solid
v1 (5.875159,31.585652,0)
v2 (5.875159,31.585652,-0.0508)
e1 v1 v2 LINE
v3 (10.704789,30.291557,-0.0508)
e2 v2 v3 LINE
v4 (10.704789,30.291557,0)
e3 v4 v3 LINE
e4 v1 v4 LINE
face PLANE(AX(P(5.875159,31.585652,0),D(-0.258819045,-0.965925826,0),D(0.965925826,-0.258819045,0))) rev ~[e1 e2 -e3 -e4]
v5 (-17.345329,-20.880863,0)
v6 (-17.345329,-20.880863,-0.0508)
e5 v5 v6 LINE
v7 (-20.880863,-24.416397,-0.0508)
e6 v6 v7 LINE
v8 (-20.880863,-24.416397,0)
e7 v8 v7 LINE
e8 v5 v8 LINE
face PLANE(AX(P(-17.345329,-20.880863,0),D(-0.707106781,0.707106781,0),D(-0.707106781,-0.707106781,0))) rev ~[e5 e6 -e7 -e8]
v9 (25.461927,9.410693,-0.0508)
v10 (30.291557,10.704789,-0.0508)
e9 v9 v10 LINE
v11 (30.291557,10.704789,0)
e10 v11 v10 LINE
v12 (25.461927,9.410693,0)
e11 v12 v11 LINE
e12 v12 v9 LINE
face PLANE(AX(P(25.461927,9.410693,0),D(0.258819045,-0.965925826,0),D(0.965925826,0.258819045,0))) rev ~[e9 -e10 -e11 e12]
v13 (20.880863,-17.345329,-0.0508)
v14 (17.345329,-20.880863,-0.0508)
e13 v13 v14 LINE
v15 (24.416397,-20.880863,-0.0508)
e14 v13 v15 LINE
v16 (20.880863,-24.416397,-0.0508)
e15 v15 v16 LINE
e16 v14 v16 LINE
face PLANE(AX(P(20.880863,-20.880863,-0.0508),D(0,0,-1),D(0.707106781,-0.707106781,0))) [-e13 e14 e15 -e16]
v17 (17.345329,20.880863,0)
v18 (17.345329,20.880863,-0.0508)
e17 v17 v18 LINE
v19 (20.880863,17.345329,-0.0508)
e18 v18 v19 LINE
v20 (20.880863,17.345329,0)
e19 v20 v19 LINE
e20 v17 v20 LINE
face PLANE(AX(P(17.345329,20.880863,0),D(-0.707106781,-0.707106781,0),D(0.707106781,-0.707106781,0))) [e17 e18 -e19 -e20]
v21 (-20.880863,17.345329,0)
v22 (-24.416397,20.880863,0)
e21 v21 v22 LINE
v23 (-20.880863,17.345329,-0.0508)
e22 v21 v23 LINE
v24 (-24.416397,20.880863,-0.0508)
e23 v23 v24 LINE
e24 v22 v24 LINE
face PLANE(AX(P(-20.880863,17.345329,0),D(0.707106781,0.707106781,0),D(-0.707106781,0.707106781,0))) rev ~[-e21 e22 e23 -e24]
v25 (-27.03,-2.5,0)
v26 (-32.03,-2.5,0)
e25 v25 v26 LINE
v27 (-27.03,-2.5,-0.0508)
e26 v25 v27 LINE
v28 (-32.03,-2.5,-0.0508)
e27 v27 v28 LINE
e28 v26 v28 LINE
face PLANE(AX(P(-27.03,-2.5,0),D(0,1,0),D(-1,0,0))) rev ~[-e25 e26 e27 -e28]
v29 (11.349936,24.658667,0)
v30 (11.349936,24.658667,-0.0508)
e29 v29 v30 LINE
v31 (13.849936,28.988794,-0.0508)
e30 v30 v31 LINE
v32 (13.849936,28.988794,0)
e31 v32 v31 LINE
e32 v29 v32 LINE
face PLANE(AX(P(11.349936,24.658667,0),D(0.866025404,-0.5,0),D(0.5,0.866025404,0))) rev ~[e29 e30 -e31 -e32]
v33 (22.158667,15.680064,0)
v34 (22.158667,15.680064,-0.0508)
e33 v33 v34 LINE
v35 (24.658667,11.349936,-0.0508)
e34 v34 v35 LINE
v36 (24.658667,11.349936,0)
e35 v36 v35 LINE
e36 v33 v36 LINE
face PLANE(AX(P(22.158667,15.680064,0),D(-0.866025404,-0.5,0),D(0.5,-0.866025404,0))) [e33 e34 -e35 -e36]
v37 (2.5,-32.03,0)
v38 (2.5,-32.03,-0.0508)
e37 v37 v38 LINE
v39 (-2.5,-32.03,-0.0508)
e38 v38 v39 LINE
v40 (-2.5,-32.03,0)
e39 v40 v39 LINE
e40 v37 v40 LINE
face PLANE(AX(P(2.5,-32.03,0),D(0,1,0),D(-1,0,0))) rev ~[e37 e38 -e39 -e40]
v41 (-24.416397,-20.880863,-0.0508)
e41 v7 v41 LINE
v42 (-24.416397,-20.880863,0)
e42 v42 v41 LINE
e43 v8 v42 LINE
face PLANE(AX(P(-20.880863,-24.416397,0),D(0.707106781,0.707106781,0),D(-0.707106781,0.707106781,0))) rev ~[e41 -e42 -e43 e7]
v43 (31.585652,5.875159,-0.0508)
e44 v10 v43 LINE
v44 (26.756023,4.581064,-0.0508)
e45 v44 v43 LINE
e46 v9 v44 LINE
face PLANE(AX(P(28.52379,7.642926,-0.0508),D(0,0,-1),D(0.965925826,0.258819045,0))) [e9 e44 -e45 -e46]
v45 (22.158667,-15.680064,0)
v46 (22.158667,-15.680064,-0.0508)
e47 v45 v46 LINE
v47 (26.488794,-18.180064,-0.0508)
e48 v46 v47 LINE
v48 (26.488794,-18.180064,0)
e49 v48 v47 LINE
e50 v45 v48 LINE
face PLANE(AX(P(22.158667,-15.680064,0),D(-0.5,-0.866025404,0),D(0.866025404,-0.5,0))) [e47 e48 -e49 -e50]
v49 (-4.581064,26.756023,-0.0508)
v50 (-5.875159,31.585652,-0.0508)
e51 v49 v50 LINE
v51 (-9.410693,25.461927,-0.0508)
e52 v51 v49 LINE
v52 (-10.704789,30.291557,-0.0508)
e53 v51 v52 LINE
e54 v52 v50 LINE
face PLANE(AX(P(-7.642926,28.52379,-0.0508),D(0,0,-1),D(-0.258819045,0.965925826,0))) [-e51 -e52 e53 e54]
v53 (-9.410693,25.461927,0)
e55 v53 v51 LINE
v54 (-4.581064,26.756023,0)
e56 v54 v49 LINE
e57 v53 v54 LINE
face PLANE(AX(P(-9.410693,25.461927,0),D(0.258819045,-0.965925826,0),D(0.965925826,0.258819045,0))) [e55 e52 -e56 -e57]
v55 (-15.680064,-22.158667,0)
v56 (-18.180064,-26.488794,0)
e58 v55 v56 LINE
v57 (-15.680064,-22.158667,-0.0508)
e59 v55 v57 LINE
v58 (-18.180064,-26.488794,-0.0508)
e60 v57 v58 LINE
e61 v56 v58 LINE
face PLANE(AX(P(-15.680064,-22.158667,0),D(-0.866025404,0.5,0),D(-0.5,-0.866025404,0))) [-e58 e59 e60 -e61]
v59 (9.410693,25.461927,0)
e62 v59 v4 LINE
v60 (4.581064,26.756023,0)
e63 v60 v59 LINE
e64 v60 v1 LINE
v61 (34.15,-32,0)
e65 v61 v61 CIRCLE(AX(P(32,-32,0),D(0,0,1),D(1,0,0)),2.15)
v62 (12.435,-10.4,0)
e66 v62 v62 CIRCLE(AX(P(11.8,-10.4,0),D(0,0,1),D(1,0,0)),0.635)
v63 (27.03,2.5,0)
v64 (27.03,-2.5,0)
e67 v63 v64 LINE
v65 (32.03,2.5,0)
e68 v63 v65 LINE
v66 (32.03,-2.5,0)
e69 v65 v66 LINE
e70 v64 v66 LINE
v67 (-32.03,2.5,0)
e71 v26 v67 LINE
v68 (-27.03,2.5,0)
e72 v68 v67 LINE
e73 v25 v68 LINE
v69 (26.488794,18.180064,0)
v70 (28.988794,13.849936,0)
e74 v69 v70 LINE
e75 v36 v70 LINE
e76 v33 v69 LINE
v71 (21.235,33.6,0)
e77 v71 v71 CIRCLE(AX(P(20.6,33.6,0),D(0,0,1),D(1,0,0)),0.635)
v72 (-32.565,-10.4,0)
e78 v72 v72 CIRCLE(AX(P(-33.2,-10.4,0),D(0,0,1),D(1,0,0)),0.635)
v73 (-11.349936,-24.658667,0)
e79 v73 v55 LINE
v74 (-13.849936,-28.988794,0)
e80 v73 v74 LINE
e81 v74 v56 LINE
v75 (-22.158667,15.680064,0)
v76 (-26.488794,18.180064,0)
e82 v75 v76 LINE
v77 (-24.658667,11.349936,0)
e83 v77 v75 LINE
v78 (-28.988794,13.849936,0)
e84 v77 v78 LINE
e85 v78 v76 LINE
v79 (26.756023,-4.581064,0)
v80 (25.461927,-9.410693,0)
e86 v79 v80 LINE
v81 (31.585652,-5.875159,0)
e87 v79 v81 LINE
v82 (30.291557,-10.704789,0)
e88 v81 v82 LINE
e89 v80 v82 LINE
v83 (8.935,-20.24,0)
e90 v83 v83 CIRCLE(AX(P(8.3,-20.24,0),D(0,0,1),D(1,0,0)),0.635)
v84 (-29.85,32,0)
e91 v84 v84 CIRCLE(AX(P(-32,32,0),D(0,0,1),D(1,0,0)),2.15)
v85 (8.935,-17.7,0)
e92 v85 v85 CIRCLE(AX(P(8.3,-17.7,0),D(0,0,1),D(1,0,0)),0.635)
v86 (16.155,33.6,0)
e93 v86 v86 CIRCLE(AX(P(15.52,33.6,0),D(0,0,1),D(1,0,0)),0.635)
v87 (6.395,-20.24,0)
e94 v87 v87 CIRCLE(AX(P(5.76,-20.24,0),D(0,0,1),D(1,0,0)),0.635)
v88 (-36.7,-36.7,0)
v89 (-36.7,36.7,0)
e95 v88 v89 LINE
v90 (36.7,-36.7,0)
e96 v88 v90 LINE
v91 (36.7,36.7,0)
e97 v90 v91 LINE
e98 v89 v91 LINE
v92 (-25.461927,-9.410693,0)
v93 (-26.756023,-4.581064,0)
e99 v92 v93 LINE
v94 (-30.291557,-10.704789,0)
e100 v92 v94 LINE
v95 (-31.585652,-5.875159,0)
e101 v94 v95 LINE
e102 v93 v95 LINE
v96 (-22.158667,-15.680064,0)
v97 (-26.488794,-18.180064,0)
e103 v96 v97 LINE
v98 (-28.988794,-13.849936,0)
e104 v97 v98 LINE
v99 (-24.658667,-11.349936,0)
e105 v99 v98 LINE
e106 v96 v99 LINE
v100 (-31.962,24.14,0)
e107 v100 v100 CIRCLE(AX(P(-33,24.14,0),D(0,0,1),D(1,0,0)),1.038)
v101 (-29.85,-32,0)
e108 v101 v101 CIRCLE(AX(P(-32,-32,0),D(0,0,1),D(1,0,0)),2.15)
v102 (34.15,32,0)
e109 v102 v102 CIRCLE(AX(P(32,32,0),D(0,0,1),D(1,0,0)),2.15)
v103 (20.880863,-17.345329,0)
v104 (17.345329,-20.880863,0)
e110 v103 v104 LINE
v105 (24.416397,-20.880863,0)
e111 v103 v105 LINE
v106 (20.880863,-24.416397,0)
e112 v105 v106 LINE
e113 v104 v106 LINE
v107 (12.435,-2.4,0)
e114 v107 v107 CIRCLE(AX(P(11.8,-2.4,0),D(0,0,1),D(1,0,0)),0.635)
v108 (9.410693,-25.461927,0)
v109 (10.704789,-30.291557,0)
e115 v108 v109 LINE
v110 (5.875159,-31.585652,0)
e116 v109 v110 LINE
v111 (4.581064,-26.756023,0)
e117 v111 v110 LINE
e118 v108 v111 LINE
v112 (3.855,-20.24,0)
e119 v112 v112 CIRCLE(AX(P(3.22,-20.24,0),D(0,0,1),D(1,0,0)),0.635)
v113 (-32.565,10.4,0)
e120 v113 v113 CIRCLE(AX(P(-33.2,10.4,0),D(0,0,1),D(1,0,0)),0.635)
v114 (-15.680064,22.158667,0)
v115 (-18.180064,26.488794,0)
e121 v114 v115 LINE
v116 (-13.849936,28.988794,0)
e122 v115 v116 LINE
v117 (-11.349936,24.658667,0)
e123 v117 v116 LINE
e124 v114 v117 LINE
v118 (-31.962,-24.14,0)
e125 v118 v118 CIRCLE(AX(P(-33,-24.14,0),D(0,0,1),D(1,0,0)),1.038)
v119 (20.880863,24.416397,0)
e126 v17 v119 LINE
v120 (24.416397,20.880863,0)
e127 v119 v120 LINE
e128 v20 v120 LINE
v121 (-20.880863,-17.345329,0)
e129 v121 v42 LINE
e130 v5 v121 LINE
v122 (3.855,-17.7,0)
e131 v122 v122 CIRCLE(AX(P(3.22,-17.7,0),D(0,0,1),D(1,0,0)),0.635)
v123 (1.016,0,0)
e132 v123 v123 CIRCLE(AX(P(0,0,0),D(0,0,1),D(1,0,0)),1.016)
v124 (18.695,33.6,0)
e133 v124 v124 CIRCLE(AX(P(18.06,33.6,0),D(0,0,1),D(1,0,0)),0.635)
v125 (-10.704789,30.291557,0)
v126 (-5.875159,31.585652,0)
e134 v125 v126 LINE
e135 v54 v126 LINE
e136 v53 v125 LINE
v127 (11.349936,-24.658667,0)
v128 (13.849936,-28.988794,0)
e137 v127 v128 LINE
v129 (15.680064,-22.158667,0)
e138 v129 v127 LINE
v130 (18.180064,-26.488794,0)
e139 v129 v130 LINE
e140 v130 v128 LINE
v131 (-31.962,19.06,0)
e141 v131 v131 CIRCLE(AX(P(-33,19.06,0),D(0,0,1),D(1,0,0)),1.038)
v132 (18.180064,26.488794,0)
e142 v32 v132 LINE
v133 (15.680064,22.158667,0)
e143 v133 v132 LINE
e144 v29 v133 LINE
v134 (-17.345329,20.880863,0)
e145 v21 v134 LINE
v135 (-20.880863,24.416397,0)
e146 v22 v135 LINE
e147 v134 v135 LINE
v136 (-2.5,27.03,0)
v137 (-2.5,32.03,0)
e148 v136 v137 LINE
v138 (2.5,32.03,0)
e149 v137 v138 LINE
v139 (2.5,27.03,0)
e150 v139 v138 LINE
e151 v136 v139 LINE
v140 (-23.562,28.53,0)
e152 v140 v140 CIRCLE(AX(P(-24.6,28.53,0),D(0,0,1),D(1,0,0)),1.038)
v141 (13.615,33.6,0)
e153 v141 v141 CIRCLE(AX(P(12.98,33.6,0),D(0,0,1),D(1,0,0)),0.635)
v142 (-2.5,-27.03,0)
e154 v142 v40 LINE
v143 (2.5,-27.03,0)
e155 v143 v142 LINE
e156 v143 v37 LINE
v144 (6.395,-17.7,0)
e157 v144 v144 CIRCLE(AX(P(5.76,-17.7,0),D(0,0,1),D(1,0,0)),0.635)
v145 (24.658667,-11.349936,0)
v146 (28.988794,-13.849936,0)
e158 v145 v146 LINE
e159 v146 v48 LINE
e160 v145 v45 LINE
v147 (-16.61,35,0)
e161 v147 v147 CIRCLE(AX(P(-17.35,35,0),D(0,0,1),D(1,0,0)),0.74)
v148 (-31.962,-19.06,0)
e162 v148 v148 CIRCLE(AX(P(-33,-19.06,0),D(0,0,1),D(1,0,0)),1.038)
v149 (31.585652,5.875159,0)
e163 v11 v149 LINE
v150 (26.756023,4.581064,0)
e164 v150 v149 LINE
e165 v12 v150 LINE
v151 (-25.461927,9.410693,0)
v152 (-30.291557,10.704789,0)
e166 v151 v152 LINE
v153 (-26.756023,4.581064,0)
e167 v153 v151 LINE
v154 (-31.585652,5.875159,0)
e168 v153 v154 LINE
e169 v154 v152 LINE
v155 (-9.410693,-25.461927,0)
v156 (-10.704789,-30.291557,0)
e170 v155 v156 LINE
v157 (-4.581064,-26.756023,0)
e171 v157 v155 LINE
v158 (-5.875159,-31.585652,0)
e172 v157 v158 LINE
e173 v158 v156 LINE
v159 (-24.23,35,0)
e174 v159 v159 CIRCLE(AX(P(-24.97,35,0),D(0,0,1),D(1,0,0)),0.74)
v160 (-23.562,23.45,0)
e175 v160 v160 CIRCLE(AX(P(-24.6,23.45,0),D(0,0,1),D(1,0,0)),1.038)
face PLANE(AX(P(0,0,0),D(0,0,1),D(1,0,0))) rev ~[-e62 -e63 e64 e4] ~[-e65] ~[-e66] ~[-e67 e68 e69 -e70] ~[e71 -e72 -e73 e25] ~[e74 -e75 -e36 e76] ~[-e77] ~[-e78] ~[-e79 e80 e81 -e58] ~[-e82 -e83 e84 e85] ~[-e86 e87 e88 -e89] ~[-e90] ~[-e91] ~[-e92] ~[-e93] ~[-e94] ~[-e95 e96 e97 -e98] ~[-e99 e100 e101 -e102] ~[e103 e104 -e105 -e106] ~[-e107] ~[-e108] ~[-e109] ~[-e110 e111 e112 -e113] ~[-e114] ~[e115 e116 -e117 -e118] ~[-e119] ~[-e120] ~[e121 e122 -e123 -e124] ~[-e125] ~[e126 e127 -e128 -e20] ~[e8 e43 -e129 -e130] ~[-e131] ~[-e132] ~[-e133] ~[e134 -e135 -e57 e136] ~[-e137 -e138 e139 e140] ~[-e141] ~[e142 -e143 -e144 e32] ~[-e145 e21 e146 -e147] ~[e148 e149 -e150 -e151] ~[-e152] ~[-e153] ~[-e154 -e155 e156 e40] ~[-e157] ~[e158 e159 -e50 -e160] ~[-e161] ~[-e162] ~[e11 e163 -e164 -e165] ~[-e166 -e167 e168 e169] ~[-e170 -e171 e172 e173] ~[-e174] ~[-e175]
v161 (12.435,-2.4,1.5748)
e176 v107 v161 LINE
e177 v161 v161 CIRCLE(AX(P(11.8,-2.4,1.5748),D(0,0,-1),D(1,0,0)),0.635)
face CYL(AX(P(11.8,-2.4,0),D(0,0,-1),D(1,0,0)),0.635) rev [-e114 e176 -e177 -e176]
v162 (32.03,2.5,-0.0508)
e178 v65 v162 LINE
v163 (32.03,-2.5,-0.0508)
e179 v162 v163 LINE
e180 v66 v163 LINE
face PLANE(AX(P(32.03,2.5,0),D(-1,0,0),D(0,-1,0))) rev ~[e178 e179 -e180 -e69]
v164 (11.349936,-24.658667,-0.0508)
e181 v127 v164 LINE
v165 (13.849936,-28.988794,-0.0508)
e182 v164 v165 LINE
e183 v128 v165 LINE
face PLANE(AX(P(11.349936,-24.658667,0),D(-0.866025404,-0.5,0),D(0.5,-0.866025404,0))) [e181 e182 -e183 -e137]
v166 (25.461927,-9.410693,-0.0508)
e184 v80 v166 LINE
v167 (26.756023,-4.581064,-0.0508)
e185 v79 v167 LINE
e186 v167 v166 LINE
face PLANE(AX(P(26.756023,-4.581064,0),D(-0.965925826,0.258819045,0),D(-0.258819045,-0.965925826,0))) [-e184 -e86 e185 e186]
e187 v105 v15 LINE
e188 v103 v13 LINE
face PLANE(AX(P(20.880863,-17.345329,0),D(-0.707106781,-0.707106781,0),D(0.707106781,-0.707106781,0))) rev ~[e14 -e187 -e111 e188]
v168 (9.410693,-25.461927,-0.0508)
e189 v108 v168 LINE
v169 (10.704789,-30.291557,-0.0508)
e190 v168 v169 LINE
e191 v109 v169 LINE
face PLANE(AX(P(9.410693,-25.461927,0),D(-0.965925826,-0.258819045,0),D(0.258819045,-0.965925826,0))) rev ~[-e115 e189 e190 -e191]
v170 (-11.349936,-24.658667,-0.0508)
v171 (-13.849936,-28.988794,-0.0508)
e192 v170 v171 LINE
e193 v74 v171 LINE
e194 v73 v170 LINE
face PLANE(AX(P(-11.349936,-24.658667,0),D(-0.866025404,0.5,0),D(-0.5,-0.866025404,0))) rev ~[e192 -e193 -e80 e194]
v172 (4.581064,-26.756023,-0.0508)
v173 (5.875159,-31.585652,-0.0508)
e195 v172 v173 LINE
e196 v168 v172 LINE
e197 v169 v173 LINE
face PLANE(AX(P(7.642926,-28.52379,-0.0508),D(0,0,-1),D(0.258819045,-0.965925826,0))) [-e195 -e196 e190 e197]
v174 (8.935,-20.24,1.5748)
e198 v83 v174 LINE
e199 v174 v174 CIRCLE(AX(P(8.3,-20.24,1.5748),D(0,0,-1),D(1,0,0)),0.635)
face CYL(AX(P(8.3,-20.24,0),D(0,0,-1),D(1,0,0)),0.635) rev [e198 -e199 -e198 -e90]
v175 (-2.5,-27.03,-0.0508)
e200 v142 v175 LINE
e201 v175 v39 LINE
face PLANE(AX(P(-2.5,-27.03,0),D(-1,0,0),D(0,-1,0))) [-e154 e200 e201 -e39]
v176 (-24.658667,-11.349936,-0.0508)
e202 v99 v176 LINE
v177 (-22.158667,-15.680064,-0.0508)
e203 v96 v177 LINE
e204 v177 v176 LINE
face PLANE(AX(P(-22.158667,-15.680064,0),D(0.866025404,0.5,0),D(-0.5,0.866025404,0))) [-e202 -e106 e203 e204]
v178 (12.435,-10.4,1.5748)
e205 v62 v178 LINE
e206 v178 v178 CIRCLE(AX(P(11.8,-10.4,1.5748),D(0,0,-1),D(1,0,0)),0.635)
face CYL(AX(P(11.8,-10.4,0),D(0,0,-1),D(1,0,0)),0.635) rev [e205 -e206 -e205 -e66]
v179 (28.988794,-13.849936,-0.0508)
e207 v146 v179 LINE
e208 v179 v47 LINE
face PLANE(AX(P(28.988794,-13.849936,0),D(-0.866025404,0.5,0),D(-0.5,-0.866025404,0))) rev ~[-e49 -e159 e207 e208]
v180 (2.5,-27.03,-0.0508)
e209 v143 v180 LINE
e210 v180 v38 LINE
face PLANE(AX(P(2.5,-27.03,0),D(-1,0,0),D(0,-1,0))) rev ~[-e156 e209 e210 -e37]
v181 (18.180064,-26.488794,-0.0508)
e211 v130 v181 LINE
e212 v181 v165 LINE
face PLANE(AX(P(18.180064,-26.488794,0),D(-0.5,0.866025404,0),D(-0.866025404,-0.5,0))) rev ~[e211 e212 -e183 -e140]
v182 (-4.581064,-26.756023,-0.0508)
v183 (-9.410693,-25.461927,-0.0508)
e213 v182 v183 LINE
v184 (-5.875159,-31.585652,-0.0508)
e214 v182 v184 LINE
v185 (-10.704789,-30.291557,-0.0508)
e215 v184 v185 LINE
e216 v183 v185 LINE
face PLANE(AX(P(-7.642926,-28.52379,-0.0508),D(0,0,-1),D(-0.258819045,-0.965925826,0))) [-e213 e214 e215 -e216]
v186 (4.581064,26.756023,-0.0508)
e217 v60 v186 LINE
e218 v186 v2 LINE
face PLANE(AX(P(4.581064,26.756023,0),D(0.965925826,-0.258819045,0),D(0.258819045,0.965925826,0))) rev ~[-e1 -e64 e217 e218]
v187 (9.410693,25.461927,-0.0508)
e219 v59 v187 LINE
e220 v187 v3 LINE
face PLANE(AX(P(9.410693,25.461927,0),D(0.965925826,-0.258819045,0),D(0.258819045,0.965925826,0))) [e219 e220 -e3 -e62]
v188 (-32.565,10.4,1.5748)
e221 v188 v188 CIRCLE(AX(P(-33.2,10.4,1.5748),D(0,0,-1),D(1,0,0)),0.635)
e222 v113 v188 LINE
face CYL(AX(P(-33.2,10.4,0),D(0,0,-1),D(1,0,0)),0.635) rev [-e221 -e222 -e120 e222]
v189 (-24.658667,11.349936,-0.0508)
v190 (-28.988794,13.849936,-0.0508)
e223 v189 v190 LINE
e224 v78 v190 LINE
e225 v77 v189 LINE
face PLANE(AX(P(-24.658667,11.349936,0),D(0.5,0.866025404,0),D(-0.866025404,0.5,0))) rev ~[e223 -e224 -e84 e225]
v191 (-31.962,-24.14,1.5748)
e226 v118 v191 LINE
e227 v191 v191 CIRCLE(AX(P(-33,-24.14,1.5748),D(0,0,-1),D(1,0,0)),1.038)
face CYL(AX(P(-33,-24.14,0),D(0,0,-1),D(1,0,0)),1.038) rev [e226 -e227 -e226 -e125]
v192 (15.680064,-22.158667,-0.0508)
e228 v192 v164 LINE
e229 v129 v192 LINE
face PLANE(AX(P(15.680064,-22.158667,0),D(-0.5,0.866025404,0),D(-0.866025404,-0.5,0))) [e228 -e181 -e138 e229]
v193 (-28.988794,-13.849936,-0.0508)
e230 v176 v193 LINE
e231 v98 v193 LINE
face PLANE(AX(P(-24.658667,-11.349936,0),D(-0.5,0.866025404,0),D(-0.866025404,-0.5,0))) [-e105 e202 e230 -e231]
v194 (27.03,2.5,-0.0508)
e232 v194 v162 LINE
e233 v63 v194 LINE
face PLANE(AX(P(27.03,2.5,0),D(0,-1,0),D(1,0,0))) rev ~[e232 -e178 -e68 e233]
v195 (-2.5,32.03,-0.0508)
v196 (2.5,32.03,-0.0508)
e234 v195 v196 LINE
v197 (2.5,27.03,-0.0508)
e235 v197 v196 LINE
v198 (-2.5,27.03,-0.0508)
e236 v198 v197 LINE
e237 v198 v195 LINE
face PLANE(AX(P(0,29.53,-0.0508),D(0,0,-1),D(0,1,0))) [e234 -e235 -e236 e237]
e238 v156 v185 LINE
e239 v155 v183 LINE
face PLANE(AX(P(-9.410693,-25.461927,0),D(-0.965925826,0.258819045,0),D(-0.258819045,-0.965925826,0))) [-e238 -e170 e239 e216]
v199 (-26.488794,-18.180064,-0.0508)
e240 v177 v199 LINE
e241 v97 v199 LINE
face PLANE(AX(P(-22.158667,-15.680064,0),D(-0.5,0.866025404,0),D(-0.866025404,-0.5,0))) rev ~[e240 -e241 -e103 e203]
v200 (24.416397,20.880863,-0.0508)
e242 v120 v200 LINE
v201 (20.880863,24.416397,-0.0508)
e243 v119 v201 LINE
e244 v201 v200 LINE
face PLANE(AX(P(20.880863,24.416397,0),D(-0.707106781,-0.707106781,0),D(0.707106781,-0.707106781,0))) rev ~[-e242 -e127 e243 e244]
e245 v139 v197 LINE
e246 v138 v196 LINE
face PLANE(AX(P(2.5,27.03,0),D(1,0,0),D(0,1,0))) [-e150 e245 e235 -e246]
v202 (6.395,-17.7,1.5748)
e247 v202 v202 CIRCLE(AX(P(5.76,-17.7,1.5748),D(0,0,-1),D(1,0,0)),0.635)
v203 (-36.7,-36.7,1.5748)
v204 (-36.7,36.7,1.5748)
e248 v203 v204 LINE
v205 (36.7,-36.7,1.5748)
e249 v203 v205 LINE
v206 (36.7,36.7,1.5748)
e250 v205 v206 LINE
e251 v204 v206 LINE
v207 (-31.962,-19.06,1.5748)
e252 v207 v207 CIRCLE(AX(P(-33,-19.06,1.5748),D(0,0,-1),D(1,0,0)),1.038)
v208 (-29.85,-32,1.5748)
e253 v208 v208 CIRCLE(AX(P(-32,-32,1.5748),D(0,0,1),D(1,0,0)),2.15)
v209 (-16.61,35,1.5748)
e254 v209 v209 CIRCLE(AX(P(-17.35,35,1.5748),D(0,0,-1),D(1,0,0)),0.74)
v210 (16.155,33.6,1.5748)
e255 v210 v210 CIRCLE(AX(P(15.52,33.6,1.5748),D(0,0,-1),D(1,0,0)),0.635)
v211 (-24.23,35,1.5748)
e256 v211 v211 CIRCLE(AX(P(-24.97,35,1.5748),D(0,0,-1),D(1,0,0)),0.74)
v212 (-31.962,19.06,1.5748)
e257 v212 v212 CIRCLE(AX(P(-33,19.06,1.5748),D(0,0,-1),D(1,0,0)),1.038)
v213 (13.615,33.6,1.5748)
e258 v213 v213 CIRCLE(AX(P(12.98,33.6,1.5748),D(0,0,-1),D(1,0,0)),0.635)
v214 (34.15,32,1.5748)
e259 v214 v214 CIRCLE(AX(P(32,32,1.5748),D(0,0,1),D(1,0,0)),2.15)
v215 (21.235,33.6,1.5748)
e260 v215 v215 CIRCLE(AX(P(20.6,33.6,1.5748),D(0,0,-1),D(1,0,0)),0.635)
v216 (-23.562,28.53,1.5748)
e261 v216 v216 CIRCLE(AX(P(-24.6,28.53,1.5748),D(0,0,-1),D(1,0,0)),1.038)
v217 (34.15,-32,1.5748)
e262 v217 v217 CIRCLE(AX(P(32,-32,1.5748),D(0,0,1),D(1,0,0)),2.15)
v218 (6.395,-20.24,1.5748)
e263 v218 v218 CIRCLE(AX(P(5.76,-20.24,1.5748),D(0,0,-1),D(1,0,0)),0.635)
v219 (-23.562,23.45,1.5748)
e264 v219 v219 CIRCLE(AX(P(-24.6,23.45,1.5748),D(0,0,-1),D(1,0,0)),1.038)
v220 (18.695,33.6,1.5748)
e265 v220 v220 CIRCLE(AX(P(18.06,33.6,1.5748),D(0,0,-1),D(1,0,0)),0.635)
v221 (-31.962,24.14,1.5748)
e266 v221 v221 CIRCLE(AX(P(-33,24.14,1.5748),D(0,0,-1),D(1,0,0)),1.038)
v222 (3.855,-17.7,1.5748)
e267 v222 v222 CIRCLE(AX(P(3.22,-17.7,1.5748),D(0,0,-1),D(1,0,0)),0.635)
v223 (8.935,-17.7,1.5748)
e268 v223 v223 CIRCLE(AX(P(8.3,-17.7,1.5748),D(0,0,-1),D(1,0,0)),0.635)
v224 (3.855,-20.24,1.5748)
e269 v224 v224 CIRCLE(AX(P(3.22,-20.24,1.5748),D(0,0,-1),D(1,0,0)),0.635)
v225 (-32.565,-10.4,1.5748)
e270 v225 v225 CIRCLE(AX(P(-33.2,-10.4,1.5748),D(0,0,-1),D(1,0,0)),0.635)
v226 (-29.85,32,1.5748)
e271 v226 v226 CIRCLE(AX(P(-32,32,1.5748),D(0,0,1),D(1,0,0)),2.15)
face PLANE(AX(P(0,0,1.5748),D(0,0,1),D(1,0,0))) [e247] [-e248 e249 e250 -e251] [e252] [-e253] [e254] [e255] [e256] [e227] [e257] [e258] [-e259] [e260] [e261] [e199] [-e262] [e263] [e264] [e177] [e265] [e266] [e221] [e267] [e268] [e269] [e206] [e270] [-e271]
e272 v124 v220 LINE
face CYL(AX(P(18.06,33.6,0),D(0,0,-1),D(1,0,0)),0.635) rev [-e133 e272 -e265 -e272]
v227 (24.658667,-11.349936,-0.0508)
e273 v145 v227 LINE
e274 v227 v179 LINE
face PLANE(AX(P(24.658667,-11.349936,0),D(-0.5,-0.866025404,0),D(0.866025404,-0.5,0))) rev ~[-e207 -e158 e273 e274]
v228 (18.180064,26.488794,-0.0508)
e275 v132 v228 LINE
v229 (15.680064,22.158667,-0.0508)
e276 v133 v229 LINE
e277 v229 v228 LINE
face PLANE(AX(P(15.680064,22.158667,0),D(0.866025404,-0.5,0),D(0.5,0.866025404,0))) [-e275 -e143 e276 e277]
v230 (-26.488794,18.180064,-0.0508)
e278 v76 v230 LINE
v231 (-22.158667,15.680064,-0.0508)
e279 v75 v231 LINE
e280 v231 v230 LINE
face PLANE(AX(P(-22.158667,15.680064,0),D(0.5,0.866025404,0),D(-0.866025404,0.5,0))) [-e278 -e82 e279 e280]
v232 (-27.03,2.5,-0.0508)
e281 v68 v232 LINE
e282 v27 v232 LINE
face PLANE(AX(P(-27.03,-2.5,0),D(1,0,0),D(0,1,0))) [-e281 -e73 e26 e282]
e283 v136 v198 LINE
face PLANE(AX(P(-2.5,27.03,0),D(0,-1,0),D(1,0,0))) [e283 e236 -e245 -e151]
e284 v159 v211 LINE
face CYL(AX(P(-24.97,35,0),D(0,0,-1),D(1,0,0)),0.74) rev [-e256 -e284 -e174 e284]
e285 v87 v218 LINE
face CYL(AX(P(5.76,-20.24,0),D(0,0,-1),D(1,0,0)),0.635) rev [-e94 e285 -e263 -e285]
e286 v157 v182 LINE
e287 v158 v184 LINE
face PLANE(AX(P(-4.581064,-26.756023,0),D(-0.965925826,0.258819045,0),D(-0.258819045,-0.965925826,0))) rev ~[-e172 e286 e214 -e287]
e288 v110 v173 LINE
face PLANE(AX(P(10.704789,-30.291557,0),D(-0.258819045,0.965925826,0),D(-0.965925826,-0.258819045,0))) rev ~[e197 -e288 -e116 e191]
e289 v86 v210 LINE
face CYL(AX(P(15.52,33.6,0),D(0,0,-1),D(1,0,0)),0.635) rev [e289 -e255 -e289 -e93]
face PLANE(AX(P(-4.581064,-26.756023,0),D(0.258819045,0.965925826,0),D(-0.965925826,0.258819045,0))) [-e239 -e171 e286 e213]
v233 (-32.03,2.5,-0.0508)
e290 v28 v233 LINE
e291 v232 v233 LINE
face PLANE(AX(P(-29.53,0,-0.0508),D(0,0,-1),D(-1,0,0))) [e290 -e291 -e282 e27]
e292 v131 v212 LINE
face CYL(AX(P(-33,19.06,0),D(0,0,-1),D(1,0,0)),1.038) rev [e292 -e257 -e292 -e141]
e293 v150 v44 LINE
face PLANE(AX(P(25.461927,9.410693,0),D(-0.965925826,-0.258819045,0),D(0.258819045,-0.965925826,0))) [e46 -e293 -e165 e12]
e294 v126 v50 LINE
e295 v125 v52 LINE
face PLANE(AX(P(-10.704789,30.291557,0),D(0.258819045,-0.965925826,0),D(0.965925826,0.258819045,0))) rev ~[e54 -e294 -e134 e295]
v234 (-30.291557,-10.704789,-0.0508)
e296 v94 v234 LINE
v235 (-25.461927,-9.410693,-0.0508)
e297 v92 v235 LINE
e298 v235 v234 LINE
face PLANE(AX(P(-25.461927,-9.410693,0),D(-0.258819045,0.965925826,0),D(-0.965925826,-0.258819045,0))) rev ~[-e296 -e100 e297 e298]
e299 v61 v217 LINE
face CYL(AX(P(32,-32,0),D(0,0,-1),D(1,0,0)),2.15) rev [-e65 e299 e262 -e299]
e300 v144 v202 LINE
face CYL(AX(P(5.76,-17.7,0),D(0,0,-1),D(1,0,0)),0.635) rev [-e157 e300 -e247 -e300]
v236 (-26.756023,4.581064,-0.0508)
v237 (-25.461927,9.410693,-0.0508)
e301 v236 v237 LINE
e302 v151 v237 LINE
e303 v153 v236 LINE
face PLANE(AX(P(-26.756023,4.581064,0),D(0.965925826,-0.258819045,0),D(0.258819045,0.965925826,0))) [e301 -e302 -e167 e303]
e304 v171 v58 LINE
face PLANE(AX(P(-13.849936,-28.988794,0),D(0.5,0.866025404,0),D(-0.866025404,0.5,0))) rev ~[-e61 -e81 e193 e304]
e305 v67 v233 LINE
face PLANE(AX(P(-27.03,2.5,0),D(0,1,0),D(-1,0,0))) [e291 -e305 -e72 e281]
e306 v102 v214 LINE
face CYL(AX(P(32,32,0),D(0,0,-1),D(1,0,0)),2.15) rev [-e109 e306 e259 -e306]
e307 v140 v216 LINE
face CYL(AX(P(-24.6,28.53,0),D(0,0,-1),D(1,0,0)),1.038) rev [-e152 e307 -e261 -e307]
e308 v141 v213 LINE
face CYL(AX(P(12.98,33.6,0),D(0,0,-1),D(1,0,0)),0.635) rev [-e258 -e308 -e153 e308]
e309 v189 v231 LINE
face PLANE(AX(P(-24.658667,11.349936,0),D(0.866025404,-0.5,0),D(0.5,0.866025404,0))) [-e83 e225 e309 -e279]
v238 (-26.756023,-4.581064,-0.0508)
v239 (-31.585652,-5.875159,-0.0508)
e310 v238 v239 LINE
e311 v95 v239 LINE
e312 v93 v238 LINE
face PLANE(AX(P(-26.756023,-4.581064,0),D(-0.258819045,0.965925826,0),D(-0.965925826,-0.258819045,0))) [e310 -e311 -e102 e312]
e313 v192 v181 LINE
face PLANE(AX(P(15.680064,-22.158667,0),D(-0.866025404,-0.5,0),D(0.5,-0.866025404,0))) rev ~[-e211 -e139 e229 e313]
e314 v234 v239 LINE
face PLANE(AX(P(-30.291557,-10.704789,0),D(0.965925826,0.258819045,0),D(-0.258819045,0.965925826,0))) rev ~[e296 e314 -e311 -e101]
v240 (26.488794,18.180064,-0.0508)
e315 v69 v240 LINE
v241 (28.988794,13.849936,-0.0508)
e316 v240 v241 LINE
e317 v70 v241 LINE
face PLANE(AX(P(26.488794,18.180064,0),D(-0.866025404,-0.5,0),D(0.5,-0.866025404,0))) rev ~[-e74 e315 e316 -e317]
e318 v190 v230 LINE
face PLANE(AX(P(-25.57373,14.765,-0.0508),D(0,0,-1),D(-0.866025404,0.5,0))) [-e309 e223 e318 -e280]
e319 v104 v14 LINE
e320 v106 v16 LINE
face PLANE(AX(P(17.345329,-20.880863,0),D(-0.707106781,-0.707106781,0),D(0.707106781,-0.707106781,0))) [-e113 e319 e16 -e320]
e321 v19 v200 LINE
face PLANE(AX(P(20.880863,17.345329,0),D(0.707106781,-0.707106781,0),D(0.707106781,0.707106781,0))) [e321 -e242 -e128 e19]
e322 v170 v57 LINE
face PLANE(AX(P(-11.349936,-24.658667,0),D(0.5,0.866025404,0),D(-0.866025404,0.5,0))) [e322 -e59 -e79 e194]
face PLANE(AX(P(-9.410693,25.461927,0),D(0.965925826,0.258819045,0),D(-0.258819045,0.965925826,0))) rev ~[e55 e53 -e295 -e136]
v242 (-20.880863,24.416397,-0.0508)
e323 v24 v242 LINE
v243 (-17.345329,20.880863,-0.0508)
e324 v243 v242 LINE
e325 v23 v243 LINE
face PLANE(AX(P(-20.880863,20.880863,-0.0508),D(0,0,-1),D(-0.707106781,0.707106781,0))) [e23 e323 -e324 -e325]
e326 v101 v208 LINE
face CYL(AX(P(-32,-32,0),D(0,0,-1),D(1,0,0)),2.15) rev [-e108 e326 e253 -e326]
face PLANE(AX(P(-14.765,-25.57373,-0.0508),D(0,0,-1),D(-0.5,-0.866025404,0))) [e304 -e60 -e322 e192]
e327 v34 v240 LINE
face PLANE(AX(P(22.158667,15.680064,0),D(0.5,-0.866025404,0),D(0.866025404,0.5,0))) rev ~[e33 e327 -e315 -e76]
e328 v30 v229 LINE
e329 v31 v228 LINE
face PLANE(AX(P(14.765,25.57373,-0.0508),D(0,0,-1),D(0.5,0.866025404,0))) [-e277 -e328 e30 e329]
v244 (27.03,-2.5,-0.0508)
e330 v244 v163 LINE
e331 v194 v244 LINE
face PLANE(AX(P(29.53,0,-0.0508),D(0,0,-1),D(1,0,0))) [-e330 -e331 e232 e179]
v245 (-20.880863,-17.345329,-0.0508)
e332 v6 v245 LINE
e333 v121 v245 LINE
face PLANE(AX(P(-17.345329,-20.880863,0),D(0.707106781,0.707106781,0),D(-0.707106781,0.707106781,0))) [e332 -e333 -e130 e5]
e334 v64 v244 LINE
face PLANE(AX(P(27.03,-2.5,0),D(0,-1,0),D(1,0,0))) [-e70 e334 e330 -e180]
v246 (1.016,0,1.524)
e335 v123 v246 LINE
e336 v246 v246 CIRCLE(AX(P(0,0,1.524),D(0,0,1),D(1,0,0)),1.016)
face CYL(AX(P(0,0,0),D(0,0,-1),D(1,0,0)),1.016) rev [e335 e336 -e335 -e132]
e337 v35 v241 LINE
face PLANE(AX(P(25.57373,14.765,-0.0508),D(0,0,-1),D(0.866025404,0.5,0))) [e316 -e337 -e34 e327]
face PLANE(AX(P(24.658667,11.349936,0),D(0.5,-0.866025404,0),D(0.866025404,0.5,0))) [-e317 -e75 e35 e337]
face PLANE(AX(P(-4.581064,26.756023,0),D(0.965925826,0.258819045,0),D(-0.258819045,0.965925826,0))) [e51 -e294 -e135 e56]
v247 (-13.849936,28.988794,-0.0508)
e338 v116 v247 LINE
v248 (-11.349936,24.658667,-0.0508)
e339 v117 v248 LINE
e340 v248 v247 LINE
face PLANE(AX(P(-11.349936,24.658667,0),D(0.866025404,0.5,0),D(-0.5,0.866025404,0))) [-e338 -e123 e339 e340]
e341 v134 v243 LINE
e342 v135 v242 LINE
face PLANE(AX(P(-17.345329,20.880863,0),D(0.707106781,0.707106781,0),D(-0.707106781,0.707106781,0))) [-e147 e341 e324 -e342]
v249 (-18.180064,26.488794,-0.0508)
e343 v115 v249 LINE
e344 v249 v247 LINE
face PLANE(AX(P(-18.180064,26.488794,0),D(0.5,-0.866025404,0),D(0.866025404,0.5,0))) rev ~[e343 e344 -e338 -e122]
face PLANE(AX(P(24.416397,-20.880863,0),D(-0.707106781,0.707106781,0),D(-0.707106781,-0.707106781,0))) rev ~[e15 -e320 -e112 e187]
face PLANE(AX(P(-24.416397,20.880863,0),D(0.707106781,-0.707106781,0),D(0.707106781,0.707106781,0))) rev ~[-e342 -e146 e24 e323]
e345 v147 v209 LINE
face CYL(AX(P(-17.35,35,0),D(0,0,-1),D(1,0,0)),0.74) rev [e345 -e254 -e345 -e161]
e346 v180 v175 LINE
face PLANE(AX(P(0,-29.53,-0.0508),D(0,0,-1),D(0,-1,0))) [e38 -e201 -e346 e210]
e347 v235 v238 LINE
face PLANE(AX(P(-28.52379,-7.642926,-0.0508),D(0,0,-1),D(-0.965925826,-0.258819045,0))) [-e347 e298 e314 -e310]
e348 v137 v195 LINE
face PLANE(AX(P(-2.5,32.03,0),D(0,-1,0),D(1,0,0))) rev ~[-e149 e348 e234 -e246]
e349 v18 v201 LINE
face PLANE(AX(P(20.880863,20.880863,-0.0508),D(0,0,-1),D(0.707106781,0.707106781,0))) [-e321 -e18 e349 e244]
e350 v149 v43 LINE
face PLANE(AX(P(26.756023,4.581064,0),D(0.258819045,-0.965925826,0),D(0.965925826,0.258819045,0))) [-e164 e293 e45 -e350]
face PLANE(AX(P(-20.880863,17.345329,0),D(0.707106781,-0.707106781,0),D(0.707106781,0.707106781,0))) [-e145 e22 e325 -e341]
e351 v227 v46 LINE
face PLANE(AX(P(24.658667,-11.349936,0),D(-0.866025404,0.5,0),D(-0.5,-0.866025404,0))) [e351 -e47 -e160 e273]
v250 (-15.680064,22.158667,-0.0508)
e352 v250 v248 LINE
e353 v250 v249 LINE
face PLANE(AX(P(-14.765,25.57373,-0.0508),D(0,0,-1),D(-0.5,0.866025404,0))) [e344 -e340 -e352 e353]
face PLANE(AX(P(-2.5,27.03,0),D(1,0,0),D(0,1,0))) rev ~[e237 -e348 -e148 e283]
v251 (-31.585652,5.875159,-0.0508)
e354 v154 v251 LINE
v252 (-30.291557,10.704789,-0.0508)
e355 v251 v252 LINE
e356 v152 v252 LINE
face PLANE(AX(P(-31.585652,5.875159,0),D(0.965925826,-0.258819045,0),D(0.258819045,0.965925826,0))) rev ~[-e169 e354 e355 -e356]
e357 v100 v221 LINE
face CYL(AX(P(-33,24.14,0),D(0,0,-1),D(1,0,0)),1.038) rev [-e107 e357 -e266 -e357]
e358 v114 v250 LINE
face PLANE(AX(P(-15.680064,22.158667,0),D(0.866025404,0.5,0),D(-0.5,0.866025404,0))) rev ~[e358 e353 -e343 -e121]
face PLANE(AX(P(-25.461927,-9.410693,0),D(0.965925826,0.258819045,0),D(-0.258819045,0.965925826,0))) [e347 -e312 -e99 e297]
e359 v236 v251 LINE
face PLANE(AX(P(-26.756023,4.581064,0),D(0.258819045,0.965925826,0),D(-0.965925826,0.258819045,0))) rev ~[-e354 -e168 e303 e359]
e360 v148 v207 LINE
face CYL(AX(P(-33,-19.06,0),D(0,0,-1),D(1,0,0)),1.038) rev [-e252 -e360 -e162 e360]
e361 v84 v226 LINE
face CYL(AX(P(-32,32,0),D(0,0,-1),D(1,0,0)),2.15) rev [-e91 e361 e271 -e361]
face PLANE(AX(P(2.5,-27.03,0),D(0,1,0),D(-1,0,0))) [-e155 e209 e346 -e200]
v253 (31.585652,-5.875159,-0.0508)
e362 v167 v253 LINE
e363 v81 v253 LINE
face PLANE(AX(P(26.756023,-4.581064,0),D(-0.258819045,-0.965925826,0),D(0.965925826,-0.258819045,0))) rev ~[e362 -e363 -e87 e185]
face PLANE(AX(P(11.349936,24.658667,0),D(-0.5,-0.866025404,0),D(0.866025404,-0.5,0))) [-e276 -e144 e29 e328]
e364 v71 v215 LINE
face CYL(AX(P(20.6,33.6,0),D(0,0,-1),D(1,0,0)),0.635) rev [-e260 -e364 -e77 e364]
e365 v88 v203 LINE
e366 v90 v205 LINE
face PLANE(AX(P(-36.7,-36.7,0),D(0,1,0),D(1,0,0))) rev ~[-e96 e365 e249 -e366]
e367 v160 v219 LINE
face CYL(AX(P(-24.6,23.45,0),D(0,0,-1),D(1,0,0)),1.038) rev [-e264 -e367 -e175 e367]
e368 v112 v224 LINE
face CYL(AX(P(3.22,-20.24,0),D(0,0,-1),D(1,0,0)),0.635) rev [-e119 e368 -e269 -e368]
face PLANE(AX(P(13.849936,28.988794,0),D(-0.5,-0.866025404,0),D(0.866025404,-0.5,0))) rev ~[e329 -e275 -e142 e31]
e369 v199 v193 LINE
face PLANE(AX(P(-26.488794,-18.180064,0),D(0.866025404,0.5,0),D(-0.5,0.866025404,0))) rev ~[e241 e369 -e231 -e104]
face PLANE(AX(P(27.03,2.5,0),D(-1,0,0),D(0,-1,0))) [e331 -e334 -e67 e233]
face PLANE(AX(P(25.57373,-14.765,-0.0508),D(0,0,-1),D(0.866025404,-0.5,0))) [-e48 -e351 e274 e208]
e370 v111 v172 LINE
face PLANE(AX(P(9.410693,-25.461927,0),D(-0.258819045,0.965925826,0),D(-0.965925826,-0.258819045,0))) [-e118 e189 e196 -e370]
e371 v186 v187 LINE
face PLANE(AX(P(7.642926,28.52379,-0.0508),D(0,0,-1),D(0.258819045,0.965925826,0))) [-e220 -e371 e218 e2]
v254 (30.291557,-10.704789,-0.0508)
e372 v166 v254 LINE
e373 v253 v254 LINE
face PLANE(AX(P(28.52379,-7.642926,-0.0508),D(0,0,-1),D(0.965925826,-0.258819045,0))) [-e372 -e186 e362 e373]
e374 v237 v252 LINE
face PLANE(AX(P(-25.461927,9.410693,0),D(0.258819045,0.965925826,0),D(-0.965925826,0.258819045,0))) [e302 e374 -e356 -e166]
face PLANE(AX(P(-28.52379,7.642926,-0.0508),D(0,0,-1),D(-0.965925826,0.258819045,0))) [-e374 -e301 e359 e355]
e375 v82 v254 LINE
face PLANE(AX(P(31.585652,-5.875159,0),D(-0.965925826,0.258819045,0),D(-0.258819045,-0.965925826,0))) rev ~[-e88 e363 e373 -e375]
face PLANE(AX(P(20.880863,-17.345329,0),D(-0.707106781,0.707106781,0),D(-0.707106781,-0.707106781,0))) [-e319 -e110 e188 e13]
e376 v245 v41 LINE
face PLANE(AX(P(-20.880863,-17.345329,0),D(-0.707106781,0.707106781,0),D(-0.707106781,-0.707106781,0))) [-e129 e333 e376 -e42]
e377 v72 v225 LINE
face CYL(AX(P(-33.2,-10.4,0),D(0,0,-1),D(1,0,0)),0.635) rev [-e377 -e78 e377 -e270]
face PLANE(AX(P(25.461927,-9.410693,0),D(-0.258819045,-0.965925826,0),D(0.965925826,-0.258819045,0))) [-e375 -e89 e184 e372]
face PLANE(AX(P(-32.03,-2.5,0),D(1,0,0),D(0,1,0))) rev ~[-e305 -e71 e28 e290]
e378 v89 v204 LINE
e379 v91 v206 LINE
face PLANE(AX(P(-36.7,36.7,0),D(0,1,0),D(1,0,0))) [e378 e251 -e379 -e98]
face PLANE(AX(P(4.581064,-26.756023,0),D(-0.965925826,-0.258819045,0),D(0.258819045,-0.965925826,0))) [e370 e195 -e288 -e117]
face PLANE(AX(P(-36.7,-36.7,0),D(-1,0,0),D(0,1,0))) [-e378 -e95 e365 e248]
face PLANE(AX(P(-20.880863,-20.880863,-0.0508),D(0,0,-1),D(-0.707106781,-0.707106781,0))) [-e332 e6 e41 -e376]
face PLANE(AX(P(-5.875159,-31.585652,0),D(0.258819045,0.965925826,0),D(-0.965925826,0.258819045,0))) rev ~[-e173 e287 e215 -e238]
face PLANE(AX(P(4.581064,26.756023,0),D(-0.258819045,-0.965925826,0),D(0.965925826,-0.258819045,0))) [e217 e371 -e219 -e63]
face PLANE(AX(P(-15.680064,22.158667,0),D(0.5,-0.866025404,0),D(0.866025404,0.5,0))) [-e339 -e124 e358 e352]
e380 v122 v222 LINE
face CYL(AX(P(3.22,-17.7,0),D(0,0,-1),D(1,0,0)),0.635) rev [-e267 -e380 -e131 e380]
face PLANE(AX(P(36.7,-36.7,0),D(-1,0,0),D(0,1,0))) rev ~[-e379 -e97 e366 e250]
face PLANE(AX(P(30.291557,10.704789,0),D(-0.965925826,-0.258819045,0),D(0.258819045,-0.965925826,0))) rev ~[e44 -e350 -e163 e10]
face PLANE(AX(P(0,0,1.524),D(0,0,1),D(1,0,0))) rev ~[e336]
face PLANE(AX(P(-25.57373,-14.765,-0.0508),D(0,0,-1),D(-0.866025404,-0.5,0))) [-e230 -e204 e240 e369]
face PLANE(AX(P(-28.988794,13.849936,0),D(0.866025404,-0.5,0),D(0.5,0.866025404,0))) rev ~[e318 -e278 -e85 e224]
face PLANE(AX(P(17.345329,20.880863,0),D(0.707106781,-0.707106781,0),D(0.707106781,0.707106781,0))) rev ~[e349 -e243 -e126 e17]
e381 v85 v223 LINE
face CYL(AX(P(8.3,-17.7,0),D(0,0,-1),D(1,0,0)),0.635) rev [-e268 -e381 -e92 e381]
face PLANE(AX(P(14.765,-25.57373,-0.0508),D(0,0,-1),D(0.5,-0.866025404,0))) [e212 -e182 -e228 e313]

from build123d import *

# Parameters (mm, degrees)
F0_W            = 73.4
F0_H            = 73.4
F0_R            = 2.15
F1_DEPTH        = 1.5748
F2_R            = 0.635
F3_DEPTH        = 1.5758
F4_W            = 5
F4_H            = 5
F5_DEPTH        = 0.0508
F5_COPIES_COUNT = 24
F8_R            = 0.74
F9_DEPTH        = 1.5758
F10_R           = 1.038
F11_DEPTH       = 1.5758
F7_R            = 1.016
F12_DEPTH       = 1.524
F13_R           = 0.635
F14_DEPTH       = 1.5758
F15_R           = 0.635
F16_DEPTH       = 1.5758


# Not quite as in the source:
# - a pattern or mirror of a feature is missing from the dataset's text; its kind, count and spacing are read off the source's solid


with BuildPart() as f1:
    # F0 (on Top) → F1 (new body)
    with BuildSketch(Plane.XY):
        Rectangle(F0_W, F0_H)
        with Locations((-32, -32)):
            Circle(F0_R, mode=Mode.SUBTRACT)
        with Locations((32, -32)):
            Circle(F0_R, mode=Mode.SUBTRACT)
        with Locations((-32, 32)):
            Circle(F0_R, mode=Mode.SUBTRACT)
        with Locations((32, 32)):
            Circle(F0_R, mode=Mode.SUBTRACT)
    extrude(amount=F1_DEPTH)

    # F2 (on Top) → F3 (cut, through all)
    with BuildSketch(Plane.XY):
        with Locations((-33.2, -10.4)):
            Circle(F2_R)
        with Locations((-33.2, 10.4)):
            Circle(F2_R)
        with Locations((11.8, -10.4)):
            Circle(F2_R)
        with Locations((11.8, -2.4)):
            Circle(F2_R)
    extrude(amount=F3_DEPTH, mode=Mode.SUBTRACT)

    # F4 (on face) → F5 (join)
    with BuildSketch(Plane(origin=(0, 0, 0), x_dir=(1, 0, 0), z_dir=(0, 0, -1))):
        with Locations((29.53, 0)):
            Rectangle(F4_W, F4_H)
    f5 = extrude(amount=F5_DEPTH)

    # F5_copies: F5 ×24 about axis
    f5_copies_axis = Axis((0, 0, 0), (0, 0, 1))
    for i in range(1, F5_COPIES_COUNT):
        add(f5.rotate(f5_copies_axis, i * 360 / F5_COPIES_COUNT))

    # F8 (on Top) → F9 (cut, through all)
    with BuildSketch(Plane.XY):
        with Locations((-24.97, 35)):
            Circle(F8_R)
        with Locations((-17.35, 35)):
            Circle(F8_R)
    extrude(amount=F9_DEPTH, mode=Mode.SUBTRACT)

    # F10 (on Top) → F11 (cut, through all)
    with BuildSketch(Plane.XY):
        with Locations((-24.6, 28.53)):
            Circle(F10_R)
        with Locations((-24.6, 23.45)):
            Circle(F10_R)
        with Locations((-33, 24.14)):
            Circle(F10_R)
        with Locations((-33, 19.06)):
            Circle(F10_R)
        with Locations((-33, -19.06)):
            Circle(F10_R)
        with Locations((-33, -24.14)):
            Circle(F10_R)
    extrude(amount=F11_DEPTH, mode=Mode.SUBTRACT)

    # F7 (on Top) → F12 (cut)
    with BuildSketch(Plane.XY):
        Circle(F7_R)
    extrude(amount=F12_DEPTH, mode=Mode.SUBTRACT)

    # F13 (on Top) → F14 (cut, through all)
    with BuildSketch(Plane.XY):
        with Locations((12.98, 33.6)):
            Circle(F13_R)
        with Locations((15.52, 33.6)):
            Circle(F13_R)
        with Locations((18.06, 33.6)):
            Circle(F13_R)
        with Locations((20.6, 33.6)):
            Circle(F13_R)
    extrude(amount=F14_DEPTH, mode=Mode.SUBTRACT)

    # F15 (on Top) → F16 (cut, through all)
    with BuildSketch(Plane.XY):
        with Locations((3.22, -17.7)):
            Circle(F15_R)
        with Locations((3.22, -20.24)):
            Circle(F15_R)
        with Locations((5.76, -20.24)):
            Circle(F15_R)
        with Locations((5.76, -17.7)):
            Circle(F15_R)
        with Locations((8.3, -17.7)):
            Circle(F15_R)
        with Locations((8.3, -20.24)):
            Circle(F15_R)
    extrude(amount=F16_DEPTH, mode=Mode.SUBTRACT)


solid = f1.part
